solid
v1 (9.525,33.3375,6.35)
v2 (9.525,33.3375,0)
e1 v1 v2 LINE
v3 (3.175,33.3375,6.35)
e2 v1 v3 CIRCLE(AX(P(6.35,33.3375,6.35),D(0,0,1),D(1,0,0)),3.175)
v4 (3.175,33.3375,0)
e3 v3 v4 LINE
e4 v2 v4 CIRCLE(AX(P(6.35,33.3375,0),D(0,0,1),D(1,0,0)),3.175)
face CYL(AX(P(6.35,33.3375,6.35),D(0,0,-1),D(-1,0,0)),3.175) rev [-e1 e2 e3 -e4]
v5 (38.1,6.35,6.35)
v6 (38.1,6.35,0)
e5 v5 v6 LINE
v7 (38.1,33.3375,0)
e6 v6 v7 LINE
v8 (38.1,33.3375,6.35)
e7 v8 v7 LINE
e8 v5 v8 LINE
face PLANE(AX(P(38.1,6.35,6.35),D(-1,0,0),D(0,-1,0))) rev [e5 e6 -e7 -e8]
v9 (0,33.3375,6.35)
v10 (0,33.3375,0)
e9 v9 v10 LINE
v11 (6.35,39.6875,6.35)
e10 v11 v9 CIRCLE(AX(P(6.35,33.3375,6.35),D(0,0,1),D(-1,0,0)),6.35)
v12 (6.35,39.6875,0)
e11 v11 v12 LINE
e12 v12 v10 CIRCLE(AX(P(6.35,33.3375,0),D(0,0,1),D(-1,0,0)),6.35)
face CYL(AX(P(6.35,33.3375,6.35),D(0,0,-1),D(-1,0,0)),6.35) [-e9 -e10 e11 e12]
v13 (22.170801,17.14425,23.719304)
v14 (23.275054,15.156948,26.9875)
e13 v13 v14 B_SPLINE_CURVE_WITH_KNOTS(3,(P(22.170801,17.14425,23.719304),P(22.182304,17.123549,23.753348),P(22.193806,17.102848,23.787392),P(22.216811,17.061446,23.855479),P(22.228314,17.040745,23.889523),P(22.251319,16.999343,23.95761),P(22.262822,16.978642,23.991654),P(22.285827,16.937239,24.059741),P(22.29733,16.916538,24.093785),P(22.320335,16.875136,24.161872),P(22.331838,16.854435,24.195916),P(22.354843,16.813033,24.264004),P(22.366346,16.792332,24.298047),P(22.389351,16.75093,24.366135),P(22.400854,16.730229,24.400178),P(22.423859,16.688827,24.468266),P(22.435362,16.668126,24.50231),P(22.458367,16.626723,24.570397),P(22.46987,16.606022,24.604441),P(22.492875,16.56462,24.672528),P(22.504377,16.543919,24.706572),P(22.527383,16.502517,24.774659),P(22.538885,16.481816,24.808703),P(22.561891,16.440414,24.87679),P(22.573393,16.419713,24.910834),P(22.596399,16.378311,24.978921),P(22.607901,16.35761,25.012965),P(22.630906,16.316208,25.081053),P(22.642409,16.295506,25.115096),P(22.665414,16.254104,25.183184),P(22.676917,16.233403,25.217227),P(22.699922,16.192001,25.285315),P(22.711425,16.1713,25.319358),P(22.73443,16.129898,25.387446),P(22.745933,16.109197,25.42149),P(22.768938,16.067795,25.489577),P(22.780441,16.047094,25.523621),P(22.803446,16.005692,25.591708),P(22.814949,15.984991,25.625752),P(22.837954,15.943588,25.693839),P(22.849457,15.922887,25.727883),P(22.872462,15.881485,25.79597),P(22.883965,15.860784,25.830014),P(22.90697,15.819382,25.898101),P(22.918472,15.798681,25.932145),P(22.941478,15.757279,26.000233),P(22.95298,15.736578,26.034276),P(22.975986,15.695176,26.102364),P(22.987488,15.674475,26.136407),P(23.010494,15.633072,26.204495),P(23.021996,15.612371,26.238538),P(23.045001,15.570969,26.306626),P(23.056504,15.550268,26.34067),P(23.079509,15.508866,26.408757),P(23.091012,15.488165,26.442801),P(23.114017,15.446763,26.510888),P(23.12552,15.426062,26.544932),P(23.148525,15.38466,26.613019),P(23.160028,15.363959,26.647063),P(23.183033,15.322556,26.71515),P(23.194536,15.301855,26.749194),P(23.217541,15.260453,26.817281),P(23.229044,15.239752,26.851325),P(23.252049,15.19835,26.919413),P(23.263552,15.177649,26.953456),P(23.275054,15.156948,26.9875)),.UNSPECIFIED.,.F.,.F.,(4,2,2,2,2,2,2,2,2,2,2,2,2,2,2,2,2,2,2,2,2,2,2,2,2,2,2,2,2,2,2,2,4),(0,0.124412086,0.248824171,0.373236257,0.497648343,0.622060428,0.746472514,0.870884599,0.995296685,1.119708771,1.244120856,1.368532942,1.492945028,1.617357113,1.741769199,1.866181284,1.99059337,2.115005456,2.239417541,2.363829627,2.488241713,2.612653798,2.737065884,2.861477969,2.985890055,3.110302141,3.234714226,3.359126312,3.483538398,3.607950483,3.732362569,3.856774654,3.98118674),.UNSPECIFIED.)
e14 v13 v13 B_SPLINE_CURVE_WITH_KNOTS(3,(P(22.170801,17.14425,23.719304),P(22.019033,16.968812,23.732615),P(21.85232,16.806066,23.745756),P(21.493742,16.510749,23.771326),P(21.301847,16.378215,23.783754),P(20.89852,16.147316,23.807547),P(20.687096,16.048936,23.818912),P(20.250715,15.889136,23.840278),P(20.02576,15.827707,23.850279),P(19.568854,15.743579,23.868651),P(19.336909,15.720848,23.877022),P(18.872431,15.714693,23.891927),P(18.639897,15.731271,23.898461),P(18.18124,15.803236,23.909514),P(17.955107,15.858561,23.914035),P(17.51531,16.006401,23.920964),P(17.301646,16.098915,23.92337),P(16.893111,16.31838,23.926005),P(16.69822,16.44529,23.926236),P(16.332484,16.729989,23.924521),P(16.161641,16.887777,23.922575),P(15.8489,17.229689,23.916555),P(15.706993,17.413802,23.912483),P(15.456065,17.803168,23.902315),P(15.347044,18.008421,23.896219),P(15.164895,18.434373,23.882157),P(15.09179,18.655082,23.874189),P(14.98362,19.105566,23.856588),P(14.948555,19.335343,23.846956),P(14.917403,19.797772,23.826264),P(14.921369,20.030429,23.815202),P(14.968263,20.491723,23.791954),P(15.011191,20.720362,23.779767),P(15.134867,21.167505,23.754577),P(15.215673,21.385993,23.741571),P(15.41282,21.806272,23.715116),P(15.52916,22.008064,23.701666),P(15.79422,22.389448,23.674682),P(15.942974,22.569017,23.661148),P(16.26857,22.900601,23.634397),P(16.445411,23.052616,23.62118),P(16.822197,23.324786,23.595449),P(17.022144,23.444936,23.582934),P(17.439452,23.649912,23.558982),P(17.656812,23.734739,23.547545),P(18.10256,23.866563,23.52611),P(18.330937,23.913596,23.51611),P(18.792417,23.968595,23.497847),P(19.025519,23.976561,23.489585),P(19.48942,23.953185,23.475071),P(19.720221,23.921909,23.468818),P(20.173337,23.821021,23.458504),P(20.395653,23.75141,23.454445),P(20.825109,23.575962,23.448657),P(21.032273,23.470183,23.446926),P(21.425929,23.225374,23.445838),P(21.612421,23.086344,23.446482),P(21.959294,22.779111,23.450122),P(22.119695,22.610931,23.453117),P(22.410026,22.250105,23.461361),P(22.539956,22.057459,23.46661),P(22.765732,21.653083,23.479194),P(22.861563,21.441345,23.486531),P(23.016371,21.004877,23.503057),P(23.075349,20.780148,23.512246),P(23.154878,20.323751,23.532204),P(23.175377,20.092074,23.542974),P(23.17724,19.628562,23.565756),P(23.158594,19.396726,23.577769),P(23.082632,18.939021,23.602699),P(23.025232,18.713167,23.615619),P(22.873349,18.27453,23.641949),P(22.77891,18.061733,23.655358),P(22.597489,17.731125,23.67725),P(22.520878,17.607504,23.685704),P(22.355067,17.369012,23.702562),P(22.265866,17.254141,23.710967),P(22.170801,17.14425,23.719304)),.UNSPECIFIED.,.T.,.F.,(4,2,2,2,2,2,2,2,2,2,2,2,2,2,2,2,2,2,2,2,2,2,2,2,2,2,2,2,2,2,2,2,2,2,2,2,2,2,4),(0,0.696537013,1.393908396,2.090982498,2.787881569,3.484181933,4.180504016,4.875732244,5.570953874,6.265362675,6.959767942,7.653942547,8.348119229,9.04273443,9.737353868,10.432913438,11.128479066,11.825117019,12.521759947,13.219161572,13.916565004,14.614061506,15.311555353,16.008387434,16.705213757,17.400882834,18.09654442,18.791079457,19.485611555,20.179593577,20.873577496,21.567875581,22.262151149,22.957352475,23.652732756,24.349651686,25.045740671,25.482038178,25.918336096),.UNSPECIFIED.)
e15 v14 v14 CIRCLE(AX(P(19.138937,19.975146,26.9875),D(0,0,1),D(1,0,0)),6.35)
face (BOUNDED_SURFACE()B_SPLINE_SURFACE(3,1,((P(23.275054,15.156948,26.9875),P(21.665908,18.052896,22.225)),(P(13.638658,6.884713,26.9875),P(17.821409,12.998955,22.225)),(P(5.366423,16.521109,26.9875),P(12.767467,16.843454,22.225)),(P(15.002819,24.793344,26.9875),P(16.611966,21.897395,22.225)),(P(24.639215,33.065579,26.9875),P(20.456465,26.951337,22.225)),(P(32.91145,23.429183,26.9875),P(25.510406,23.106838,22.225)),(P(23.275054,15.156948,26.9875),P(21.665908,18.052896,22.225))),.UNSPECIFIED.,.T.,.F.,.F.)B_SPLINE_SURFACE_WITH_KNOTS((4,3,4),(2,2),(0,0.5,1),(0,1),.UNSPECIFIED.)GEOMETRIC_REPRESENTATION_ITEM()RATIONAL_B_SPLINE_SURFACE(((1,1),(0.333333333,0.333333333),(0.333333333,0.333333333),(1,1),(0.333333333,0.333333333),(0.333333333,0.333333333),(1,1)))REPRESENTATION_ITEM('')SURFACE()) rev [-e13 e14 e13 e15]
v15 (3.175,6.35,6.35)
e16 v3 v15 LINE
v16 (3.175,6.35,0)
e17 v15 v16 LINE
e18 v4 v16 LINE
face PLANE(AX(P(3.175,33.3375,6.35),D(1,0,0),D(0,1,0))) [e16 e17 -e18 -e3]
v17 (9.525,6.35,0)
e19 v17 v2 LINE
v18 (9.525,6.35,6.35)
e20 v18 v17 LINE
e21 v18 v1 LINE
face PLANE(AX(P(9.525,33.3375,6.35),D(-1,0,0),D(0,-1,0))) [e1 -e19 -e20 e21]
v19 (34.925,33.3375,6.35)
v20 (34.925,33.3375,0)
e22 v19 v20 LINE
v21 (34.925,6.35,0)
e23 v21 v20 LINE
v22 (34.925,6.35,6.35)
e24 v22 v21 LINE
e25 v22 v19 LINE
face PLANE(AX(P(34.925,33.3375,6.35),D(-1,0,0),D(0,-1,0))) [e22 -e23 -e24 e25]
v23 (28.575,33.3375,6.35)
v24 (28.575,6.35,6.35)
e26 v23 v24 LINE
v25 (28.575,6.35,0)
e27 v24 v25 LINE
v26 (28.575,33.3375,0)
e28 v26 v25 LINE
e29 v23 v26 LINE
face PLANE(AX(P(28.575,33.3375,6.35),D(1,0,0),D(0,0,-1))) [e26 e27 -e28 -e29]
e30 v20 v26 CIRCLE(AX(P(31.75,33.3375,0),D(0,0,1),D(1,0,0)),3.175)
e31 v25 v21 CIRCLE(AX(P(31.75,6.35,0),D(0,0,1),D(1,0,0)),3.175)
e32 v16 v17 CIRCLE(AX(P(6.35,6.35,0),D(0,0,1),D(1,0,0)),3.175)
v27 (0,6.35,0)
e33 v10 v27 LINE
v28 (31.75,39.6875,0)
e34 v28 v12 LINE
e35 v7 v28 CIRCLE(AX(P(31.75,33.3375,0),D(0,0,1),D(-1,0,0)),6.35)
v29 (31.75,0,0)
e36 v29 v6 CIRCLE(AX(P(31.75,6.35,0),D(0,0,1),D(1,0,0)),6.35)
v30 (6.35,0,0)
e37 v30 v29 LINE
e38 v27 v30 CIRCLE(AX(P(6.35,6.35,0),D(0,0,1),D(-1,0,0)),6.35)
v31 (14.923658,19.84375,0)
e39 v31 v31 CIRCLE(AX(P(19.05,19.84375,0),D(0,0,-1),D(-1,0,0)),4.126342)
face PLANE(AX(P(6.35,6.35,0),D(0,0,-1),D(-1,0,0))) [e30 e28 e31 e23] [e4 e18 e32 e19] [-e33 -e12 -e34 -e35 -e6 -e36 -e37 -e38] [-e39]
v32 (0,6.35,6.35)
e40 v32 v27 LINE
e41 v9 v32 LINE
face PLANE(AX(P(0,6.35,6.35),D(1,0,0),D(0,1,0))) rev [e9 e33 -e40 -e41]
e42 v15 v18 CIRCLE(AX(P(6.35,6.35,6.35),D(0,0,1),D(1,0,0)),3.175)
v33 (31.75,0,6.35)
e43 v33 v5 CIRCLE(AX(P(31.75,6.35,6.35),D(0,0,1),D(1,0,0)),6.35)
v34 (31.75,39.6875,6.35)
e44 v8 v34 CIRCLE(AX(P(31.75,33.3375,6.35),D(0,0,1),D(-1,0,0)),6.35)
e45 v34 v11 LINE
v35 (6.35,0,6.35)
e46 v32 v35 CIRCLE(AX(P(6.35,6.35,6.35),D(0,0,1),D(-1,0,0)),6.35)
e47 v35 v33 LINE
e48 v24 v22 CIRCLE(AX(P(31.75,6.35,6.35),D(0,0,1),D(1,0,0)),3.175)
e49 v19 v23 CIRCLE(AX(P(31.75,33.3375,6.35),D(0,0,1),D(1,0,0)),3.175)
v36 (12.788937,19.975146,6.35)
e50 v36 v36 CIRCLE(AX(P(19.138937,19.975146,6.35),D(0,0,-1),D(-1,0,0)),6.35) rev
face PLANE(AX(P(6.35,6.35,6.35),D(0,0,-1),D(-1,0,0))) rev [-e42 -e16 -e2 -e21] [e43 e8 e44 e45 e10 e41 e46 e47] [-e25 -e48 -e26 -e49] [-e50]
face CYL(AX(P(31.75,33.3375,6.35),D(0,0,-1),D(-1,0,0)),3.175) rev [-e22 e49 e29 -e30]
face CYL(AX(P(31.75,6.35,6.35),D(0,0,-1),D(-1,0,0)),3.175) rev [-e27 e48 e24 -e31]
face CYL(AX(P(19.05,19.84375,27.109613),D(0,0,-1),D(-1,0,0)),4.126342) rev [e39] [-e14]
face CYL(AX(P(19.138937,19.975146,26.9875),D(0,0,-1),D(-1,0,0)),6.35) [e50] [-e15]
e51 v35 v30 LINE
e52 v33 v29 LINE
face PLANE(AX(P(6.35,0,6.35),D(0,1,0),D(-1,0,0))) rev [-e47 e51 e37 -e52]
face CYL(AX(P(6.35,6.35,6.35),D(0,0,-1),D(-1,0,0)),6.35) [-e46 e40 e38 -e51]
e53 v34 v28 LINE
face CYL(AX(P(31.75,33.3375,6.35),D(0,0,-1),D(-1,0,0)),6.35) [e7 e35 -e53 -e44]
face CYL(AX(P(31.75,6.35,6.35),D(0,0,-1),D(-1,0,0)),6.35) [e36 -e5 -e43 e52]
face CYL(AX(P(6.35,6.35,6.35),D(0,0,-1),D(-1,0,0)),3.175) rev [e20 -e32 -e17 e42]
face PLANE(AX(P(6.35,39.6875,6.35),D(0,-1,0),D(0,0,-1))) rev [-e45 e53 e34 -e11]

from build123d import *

# Parameters (mm, degrees)
BOSS_EXTRUDE1_DEPTH = 6.35
SKETCH3_R           = 6.35
BOSS_EXTRUDE2_DEPTH = 20.6375
SKETCH5_R           = 4.126342011
CUT_EXTRUDE2_DEPTH  = 62.278322577


with BuildPart() as part:
    # Sketch2 → Boss-Extrude1 (new body)
    with BuildSketch(Plane.XY):
        with BuildLine():
            Line((6.35, 0), (31.75, 0))
            ThreePointArc((31.75, 0), (36.240128061, 1.859871939), (38.1, 6.35))
            Line((38.1, 6.35), (38.1, 33.3375))
            ThreePointArc((38.1, 33.3375), (36.240128061, 37.827628061), (31.75, 39.6875))
            Line((31.75, 39.6875), (6.35, 39.6875))
            ThreePointArc((6.35, 39.6875), (1.859871939, 37.827628061), (0, 33.3375))
            Line((0, 33.3375), (0, 6.35))
            ThreePointArc((0, 6.35), (1.859871939, 1.859871939), (6.35, 0))
        make_face()
        with BuildLine():
            Line((9.525, 33.3375), (9.525, 6.35))
            ThreePointArc((9.525, 6.35), (6.35, 3.175), (3.175, 6.35))
            Line((3.175, 6.35), (3.175, 33.3375))
            ThreePointArc((3.175, 33.3375), (6.35, 36.5125), (9.525, 33.3375))
        make_face(mode=Mode.SUBTRACT)
        with BuildLine():
            Line((34.925, 33.3375), (34.925, 6.35))
            ThreePointArc((34.925, 6.35), (31.75, 3.175), (28.575, 6.35))
            Line((28.575, 6.35), (28.575, 33.3375))
            ThreePointArc((28.575, 33.3375), (31.75, 36.5125), (34.925, 33.3375))
        make_face(mode=Mode.SUBTRACT)
    extrude(amount=BOSS_EXTRUDE1_DEPTH)

    # Sketch3 → Boss-Extrude2 (add)
    with BuildSketch(Plane.XY.offset(6.35)):
        with Locations(Location((19.138936621, 19.975145899, 0), (0, 0, 180))):
            Circle(SKETCH3_R)
    extrude(amount=BOSS_EXTRUDE2_DEPTH)

    # Cut-Loft1: read off the stored shape, not the designer's step
    # Cut-Loft1: loft between two sections, ruled curve by curve
    cut_loft1_from = [
        Edge.make_bspline([(23.27505423, 15.156947986, 26.9875), (13.638658406, 6.884712768, 26.9875), (5.366423187, 16.521108592, 26.9875), (15.002819012, 24.793343811, 26.9875), (24.639214837, 33.065579029, 26.9875), (32.911450055, 23.429183205, 26.9875), (23.27505423, 15.156947986, 26.9875)], [0, 0, 0, 0, 0.5, 0.5, 0.5, 1, 1, 1, 1], 3, [1, 0.333333333, 0.333333333, 1, 0.333333333, 0.333333333, 1]),
    ]
    cut_loft1_to = [
        Edge.make_bspline([(21.665907522, 18.052896418, 22.225), (17.82140856, 12.998954616, 22.225), (12.767466759, 16.843453578, 22.225), (16.611965721, 21.89739538, 22.225), (20.456464682, 26.951337181, 22.225), (25.510406484, 23.106838219, 22.225), (21.665907522, 18.052896418, 22.225)], [0, 0, 0, 0, 0.5, 0.5, 0.5, 1, 1, 1, 1], 3, [1, 0.333333333, 0.333333333, 1, 0.333333333, 0.333333333, 1]),
    ]
    cut_loft1 = Solid(Shell([*[Face.make_surface_from_curves(cut_loft1_from[k], cut_loft1_to[k]) for k in range(1)], Face(Wire(cut_loft1_from)), Face(Wire(cut_loft1_to))]))
    add(cut_loft1, mode=Mode.SUBTRACT)

    # Sketch5 → Cut-Extrude2 (cut, through all)
    with BuildSketch(Plane(origin=(0, 0, 0), x_dir=(-1, 0, 0), z_dir=(0, 0, -1))):
        with Locations((-19.05, 19.84375)):
            Circle(SKETCH5_R)
    extrude(amount=-CUT_EXTRUDE2_DEPTH, mode=Mode.SUBTRACT)


solid = part.part
